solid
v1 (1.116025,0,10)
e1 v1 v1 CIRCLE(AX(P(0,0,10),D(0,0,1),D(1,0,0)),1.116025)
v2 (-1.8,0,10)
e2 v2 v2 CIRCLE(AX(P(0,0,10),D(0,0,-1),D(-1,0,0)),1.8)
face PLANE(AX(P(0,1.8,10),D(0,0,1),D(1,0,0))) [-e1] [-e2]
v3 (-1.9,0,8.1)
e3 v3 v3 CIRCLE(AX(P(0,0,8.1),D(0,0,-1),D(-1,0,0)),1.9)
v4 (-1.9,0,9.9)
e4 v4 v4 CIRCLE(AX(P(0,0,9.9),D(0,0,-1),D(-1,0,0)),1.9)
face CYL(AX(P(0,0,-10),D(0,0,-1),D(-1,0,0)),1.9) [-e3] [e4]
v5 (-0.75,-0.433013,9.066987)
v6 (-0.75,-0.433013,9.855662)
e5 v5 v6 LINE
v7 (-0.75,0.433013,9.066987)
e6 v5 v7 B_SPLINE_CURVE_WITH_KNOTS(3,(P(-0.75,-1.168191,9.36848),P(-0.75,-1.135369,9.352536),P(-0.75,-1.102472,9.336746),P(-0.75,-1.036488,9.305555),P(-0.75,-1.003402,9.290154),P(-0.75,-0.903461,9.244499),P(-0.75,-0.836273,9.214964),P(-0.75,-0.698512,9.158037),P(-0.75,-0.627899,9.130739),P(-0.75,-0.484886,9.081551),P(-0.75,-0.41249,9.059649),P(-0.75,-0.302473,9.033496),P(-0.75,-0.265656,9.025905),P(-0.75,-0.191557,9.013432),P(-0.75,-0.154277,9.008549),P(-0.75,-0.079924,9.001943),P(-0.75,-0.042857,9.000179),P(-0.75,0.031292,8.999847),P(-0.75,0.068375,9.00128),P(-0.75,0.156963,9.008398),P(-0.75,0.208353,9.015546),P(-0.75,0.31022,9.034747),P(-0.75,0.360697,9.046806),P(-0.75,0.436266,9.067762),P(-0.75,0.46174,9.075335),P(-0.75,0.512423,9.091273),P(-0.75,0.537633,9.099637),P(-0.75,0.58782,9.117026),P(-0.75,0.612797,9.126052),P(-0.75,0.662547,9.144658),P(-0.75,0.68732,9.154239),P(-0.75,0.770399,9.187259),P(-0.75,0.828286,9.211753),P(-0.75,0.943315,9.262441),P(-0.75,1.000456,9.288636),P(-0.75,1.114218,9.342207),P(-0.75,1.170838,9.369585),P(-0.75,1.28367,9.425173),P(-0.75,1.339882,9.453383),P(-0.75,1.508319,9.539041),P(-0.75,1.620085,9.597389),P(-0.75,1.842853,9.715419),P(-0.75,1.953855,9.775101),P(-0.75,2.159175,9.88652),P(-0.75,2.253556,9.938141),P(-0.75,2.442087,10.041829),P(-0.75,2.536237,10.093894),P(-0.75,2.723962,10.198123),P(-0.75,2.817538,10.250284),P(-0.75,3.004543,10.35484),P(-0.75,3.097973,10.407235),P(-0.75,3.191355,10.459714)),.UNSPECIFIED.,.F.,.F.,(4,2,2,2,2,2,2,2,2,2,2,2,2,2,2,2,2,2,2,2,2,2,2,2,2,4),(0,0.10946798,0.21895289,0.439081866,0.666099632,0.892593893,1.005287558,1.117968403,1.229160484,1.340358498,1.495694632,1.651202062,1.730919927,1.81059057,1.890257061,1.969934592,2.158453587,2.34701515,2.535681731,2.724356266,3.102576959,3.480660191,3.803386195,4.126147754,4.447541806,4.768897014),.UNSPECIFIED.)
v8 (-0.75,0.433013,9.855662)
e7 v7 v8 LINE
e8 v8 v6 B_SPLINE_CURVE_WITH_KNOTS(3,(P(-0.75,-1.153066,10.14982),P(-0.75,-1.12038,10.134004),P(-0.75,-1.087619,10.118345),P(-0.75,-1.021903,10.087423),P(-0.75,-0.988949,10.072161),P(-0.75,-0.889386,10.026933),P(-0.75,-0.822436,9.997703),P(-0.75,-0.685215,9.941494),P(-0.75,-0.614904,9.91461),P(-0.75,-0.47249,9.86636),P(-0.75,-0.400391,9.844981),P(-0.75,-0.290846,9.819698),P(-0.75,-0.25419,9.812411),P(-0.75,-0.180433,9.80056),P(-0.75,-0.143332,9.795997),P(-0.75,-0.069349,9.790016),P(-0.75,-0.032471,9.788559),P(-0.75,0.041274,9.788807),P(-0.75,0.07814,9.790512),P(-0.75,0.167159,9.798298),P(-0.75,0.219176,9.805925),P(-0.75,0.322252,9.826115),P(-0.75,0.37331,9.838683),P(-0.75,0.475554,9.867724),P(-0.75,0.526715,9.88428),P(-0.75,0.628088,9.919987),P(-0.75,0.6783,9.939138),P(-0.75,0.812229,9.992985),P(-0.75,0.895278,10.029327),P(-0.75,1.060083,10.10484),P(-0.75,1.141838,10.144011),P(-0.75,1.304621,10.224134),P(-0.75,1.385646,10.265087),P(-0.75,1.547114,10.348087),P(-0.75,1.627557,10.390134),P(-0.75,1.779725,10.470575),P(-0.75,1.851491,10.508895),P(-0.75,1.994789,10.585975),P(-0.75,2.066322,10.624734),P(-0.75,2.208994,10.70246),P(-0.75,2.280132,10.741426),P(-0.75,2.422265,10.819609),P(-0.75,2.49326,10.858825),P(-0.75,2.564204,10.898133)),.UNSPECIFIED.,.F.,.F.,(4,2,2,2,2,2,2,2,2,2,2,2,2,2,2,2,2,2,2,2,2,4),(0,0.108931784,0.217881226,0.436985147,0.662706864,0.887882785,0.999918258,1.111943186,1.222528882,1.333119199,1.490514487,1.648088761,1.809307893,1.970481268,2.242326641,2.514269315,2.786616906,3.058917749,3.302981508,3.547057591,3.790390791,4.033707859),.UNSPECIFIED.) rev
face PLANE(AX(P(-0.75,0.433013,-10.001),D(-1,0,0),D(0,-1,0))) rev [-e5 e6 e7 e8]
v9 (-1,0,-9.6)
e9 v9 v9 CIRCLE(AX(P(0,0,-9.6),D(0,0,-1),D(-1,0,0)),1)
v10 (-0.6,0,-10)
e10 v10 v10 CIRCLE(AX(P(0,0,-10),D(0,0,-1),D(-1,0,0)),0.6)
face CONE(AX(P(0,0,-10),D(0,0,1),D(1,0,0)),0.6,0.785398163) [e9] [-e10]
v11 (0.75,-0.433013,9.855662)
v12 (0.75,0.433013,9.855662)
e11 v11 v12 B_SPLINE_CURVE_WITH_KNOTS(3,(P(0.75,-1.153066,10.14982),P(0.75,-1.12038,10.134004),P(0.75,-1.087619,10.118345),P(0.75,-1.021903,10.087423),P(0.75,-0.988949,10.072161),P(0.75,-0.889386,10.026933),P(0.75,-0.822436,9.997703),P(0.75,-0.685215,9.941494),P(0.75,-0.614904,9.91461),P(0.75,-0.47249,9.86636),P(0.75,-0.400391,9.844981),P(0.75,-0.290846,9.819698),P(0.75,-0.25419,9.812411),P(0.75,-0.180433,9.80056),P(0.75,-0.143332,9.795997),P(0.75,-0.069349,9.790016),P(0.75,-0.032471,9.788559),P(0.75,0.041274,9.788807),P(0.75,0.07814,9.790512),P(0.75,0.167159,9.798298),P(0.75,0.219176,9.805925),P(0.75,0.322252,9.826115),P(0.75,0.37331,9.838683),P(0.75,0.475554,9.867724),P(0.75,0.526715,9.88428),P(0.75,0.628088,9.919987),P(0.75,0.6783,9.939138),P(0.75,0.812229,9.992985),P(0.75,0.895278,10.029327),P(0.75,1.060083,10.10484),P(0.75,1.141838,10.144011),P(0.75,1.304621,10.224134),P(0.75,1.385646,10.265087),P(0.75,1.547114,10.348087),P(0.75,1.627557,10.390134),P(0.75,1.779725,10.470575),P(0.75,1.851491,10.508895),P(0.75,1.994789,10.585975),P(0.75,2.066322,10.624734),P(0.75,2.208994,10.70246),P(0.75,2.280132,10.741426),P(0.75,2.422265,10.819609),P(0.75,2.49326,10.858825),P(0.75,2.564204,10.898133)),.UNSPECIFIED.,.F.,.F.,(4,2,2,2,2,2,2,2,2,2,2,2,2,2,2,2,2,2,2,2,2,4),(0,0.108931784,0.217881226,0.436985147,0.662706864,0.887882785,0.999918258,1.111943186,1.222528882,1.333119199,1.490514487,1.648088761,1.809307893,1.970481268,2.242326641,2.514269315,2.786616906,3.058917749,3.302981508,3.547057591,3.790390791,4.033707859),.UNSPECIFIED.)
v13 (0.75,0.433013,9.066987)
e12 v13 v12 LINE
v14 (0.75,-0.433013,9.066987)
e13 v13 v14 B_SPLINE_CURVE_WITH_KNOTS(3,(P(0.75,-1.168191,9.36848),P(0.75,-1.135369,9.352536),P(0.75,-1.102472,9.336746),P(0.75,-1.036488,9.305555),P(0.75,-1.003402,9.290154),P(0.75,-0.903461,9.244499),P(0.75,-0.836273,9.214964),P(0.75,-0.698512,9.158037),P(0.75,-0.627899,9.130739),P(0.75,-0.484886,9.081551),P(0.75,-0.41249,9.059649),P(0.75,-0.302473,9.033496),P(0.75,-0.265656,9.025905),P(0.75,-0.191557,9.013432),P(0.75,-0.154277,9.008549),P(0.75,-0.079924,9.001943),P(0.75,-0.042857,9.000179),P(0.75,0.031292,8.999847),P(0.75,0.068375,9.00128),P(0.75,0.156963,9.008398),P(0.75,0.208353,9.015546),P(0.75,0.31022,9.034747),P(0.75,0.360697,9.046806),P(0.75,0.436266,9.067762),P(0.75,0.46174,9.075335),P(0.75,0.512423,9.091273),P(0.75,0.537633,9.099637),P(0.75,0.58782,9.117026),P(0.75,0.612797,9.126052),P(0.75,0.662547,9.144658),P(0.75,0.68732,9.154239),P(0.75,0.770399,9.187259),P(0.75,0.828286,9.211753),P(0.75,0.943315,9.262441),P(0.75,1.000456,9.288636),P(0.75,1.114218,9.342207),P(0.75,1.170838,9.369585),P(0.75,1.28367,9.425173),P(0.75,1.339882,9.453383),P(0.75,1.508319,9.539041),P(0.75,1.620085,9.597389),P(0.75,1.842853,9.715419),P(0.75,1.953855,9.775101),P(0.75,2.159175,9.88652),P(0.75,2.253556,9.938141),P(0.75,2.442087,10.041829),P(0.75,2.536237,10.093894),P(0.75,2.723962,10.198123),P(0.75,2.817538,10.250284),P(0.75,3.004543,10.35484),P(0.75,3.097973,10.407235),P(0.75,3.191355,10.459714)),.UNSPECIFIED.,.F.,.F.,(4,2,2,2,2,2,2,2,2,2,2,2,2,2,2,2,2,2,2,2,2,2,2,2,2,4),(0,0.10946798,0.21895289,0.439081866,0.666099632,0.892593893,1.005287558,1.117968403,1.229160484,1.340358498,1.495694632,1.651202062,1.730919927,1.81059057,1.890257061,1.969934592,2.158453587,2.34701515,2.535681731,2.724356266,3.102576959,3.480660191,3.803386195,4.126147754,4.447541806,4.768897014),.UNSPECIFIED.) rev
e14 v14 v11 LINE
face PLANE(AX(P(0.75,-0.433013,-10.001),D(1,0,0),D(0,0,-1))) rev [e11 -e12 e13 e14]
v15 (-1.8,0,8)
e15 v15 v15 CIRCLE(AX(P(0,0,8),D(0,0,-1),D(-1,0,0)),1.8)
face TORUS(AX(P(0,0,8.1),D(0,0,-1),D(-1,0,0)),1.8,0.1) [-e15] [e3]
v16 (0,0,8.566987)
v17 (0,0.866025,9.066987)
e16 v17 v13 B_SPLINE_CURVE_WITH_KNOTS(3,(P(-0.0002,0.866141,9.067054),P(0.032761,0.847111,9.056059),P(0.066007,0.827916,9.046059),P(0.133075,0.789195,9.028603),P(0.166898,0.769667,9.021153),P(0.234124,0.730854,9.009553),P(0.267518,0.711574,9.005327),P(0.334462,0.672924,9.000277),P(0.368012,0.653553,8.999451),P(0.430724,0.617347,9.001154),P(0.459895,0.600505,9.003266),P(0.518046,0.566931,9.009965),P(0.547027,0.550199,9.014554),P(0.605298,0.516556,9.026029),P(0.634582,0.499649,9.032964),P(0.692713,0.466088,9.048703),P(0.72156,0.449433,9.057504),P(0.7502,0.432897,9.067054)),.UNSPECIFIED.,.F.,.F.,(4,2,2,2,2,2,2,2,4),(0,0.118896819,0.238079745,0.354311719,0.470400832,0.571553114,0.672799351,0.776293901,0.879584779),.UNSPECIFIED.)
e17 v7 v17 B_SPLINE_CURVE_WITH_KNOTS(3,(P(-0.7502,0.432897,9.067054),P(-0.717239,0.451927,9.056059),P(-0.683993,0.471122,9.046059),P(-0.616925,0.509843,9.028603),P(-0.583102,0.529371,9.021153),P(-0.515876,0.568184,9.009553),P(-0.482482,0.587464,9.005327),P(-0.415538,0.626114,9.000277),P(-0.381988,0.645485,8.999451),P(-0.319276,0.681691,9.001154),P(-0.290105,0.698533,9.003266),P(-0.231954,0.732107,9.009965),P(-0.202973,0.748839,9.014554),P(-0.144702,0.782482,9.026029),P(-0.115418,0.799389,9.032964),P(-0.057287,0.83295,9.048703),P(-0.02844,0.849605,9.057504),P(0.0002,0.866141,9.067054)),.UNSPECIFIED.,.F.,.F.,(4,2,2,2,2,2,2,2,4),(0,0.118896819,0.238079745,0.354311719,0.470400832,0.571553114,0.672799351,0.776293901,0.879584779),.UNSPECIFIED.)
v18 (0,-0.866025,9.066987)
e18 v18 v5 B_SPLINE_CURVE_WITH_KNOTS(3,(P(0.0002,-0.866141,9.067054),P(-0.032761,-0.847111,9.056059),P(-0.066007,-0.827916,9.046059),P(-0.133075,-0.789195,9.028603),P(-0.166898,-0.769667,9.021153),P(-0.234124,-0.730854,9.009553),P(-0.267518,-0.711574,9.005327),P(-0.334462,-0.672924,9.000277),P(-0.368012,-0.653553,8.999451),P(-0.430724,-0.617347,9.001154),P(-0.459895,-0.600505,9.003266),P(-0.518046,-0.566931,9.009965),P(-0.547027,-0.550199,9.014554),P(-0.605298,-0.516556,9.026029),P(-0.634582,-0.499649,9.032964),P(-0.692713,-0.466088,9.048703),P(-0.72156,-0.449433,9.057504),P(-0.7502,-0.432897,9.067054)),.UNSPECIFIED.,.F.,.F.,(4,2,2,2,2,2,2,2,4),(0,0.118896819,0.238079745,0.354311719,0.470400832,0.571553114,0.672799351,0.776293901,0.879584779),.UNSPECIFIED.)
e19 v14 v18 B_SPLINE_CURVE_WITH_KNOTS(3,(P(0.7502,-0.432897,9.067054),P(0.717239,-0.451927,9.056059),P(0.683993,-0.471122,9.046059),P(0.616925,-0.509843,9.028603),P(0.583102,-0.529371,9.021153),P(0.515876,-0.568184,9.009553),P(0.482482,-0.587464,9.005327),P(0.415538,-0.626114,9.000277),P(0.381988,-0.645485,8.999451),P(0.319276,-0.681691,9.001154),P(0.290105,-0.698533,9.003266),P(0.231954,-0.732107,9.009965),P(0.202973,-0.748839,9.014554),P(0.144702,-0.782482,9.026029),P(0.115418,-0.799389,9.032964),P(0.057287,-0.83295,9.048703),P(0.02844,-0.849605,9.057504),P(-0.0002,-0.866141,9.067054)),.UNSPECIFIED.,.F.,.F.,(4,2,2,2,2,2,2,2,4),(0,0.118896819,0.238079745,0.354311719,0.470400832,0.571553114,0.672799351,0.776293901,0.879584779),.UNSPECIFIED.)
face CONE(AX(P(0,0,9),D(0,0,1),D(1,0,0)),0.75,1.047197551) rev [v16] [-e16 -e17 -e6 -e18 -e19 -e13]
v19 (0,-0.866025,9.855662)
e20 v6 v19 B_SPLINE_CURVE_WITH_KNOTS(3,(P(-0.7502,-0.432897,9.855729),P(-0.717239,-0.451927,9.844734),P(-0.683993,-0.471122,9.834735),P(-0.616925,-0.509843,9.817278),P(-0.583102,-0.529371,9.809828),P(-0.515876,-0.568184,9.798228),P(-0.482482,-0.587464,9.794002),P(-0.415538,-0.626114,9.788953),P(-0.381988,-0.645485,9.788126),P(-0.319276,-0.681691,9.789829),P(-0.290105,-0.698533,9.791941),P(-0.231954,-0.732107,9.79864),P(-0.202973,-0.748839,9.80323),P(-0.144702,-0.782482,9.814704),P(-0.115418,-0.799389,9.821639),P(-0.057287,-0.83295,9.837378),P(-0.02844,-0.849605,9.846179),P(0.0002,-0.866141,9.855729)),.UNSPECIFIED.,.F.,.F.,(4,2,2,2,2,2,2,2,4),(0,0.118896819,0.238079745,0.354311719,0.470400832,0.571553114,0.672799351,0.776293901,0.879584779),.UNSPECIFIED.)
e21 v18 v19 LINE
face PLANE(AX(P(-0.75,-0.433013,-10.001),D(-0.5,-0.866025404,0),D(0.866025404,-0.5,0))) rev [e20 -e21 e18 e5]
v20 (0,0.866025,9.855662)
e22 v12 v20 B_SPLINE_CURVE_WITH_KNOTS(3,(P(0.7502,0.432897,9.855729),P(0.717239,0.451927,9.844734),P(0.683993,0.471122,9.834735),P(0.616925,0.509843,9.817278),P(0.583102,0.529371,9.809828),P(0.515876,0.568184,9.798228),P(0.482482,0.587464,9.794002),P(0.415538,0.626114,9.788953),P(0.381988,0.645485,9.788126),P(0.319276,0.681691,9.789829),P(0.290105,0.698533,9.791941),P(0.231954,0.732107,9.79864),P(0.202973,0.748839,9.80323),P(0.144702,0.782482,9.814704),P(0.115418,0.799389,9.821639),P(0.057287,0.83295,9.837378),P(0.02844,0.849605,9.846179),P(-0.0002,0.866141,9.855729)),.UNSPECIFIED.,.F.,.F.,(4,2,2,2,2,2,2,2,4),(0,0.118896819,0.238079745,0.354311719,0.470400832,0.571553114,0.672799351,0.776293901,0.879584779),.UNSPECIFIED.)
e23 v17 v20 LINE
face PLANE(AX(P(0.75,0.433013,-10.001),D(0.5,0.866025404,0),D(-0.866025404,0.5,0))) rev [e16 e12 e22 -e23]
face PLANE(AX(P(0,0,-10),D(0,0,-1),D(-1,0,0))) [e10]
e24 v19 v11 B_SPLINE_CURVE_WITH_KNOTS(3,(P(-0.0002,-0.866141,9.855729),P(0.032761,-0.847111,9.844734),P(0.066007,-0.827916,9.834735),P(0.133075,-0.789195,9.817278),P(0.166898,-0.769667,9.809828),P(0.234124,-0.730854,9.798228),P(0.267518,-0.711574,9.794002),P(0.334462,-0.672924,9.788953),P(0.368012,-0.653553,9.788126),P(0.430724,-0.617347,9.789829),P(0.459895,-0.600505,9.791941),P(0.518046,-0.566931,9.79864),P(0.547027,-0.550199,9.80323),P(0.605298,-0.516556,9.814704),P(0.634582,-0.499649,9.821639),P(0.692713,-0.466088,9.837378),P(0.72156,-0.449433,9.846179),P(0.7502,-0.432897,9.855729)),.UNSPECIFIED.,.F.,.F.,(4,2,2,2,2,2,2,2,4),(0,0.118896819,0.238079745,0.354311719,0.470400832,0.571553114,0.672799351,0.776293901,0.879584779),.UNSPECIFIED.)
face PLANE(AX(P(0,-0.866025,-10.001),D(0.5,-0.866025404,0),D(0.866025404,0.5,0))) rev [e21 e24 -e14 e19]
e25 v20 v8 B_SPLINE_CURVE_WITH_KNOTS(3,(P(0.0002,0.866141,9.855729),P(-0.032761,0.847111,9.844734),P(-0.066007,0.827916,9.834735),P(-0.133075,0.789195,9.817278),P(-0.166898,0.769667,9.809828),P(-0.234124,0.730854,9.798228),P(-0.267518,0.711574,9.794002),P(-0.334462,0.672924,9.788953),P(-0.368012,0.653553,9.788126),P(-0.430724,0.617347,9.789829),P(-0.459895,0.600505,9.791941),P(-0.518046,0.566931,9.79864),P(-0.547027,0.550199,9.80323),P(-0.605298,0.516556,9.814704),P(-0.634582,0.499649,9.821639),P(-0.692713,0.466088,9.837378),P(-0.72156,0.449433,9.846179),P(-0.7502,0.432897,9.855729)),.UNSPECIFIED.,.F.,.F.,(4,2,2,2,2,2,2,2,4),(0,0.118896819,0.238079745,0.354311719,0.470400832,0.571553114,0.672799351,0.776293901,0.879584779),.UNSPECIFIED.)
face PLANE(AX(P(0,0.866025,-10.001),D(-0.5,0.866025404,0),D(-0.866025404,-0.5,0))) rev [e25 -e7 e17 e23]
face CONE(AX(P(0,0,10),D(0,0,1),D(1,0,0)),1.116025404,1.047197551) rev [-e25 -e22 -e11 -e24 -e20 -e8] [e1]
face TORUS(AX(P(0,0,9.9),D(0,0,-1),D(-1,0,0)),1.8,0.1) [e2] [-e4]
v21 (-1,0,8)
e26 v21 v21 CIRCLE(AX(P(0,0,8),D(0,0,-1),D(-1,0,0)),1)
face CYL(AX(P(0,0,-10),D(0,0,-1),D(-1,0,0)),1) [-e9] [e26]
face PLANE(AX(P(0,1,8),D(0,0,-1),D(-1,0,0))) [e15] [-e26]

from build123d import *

# Parameters (mm, degrees)
CUT_EXTRUDE1_REACH = 22.355
CUT_EXTRUDE1_START = 10


with BuildPart() as part:
    # Sketch2 → Revolve1 (revolve)
    with BuildSketch(Plane(origin=(0, 0, 0), x_dir=(0, 0, -1), z_dir=(1, 0, 0))):
        with BuildLine():
            Line((10, 0), (10, 0.6))
            Line((10, 0.6), (9.6, 1))
            Line((9.6, 1), (-8, 1))
            Line((-8, 1), (-8, 1.8))
            ThreePointArc((-8, 1.8), (-8.029289322, 1.870710678), (-8.1, 1.9))
            Line((-8.1, 1.9), (-9.9, 1.9))
            ThreePointArc((-9.9, 1.9), (-9.970710678, 1.870710678), (-10, 1.8))
            Line((-10, 1.8), (-10, 0.75))
            Line((-10, 0.75), (-9, 0.75))
            Line((-9, 0.75), (-8.566987298, 0))
            Line((-8.566987298, 0), (10, 0))
        make_face()
    revolve(axis=Axis((0, 0, -10), (0, 0, 1)))

    # Cut-Extrude1: up to this cone (the profile starts inside it)
    cut_extrude1_end = Plane(origin=(0, 0, 10), z_dir=(0, 0, 1)).offset(-1.433011702) * Cone(1.732e-06, 46.36711012, 26.770062509, align=(Align.CENTER, Align.CENTER, Align.MIN), mode=Mode.PRIVATE)
    # Sketch3 → Cut-Extrude1 (cut, up to the surface)
    with BuildSketch(Plane.XY.offset(CUT_EXTRUDE1_START), mode=Mode.PRIVATE) as cut_extrude1_sk1:
        Polygon((-0.75, 0.433012702), (-0.75, -0.433012702), (0, -0.866025404), (0.75, -0.433012702), (0.75, 0.433012702), (0, 0.866025404), align=None)
    cut_extrude1_tool1 = extrude(cut_extrude1_sk1.sketch, amount=-CUT_EXTRUDE1_REACH, mode=Mode.PRIVATE) & cut_extrude1_end
    add(cut_extrude1_tool1.solids().sort_by_distance((0, 0, 10))[0], mode=Mode.SUBTRACT)

    # Cut-Extrude2 cone 1 section (through the dimple's axis) → Cut-Extrude2 (revolve, cut)
    with BuildSketch(Plane(origin=(0, 0, 10), x_dir=(0, -1, 0), z_dir=(1, 0, 0))):
        Polygon((0, 0), (1.116025404, 0), (0, 0.644337567), align=None)
    revolve(axis=Axis((0, 0, 10), (0, 0, -1)), mode=Mode.SUBTRACT)


solid = part.part
